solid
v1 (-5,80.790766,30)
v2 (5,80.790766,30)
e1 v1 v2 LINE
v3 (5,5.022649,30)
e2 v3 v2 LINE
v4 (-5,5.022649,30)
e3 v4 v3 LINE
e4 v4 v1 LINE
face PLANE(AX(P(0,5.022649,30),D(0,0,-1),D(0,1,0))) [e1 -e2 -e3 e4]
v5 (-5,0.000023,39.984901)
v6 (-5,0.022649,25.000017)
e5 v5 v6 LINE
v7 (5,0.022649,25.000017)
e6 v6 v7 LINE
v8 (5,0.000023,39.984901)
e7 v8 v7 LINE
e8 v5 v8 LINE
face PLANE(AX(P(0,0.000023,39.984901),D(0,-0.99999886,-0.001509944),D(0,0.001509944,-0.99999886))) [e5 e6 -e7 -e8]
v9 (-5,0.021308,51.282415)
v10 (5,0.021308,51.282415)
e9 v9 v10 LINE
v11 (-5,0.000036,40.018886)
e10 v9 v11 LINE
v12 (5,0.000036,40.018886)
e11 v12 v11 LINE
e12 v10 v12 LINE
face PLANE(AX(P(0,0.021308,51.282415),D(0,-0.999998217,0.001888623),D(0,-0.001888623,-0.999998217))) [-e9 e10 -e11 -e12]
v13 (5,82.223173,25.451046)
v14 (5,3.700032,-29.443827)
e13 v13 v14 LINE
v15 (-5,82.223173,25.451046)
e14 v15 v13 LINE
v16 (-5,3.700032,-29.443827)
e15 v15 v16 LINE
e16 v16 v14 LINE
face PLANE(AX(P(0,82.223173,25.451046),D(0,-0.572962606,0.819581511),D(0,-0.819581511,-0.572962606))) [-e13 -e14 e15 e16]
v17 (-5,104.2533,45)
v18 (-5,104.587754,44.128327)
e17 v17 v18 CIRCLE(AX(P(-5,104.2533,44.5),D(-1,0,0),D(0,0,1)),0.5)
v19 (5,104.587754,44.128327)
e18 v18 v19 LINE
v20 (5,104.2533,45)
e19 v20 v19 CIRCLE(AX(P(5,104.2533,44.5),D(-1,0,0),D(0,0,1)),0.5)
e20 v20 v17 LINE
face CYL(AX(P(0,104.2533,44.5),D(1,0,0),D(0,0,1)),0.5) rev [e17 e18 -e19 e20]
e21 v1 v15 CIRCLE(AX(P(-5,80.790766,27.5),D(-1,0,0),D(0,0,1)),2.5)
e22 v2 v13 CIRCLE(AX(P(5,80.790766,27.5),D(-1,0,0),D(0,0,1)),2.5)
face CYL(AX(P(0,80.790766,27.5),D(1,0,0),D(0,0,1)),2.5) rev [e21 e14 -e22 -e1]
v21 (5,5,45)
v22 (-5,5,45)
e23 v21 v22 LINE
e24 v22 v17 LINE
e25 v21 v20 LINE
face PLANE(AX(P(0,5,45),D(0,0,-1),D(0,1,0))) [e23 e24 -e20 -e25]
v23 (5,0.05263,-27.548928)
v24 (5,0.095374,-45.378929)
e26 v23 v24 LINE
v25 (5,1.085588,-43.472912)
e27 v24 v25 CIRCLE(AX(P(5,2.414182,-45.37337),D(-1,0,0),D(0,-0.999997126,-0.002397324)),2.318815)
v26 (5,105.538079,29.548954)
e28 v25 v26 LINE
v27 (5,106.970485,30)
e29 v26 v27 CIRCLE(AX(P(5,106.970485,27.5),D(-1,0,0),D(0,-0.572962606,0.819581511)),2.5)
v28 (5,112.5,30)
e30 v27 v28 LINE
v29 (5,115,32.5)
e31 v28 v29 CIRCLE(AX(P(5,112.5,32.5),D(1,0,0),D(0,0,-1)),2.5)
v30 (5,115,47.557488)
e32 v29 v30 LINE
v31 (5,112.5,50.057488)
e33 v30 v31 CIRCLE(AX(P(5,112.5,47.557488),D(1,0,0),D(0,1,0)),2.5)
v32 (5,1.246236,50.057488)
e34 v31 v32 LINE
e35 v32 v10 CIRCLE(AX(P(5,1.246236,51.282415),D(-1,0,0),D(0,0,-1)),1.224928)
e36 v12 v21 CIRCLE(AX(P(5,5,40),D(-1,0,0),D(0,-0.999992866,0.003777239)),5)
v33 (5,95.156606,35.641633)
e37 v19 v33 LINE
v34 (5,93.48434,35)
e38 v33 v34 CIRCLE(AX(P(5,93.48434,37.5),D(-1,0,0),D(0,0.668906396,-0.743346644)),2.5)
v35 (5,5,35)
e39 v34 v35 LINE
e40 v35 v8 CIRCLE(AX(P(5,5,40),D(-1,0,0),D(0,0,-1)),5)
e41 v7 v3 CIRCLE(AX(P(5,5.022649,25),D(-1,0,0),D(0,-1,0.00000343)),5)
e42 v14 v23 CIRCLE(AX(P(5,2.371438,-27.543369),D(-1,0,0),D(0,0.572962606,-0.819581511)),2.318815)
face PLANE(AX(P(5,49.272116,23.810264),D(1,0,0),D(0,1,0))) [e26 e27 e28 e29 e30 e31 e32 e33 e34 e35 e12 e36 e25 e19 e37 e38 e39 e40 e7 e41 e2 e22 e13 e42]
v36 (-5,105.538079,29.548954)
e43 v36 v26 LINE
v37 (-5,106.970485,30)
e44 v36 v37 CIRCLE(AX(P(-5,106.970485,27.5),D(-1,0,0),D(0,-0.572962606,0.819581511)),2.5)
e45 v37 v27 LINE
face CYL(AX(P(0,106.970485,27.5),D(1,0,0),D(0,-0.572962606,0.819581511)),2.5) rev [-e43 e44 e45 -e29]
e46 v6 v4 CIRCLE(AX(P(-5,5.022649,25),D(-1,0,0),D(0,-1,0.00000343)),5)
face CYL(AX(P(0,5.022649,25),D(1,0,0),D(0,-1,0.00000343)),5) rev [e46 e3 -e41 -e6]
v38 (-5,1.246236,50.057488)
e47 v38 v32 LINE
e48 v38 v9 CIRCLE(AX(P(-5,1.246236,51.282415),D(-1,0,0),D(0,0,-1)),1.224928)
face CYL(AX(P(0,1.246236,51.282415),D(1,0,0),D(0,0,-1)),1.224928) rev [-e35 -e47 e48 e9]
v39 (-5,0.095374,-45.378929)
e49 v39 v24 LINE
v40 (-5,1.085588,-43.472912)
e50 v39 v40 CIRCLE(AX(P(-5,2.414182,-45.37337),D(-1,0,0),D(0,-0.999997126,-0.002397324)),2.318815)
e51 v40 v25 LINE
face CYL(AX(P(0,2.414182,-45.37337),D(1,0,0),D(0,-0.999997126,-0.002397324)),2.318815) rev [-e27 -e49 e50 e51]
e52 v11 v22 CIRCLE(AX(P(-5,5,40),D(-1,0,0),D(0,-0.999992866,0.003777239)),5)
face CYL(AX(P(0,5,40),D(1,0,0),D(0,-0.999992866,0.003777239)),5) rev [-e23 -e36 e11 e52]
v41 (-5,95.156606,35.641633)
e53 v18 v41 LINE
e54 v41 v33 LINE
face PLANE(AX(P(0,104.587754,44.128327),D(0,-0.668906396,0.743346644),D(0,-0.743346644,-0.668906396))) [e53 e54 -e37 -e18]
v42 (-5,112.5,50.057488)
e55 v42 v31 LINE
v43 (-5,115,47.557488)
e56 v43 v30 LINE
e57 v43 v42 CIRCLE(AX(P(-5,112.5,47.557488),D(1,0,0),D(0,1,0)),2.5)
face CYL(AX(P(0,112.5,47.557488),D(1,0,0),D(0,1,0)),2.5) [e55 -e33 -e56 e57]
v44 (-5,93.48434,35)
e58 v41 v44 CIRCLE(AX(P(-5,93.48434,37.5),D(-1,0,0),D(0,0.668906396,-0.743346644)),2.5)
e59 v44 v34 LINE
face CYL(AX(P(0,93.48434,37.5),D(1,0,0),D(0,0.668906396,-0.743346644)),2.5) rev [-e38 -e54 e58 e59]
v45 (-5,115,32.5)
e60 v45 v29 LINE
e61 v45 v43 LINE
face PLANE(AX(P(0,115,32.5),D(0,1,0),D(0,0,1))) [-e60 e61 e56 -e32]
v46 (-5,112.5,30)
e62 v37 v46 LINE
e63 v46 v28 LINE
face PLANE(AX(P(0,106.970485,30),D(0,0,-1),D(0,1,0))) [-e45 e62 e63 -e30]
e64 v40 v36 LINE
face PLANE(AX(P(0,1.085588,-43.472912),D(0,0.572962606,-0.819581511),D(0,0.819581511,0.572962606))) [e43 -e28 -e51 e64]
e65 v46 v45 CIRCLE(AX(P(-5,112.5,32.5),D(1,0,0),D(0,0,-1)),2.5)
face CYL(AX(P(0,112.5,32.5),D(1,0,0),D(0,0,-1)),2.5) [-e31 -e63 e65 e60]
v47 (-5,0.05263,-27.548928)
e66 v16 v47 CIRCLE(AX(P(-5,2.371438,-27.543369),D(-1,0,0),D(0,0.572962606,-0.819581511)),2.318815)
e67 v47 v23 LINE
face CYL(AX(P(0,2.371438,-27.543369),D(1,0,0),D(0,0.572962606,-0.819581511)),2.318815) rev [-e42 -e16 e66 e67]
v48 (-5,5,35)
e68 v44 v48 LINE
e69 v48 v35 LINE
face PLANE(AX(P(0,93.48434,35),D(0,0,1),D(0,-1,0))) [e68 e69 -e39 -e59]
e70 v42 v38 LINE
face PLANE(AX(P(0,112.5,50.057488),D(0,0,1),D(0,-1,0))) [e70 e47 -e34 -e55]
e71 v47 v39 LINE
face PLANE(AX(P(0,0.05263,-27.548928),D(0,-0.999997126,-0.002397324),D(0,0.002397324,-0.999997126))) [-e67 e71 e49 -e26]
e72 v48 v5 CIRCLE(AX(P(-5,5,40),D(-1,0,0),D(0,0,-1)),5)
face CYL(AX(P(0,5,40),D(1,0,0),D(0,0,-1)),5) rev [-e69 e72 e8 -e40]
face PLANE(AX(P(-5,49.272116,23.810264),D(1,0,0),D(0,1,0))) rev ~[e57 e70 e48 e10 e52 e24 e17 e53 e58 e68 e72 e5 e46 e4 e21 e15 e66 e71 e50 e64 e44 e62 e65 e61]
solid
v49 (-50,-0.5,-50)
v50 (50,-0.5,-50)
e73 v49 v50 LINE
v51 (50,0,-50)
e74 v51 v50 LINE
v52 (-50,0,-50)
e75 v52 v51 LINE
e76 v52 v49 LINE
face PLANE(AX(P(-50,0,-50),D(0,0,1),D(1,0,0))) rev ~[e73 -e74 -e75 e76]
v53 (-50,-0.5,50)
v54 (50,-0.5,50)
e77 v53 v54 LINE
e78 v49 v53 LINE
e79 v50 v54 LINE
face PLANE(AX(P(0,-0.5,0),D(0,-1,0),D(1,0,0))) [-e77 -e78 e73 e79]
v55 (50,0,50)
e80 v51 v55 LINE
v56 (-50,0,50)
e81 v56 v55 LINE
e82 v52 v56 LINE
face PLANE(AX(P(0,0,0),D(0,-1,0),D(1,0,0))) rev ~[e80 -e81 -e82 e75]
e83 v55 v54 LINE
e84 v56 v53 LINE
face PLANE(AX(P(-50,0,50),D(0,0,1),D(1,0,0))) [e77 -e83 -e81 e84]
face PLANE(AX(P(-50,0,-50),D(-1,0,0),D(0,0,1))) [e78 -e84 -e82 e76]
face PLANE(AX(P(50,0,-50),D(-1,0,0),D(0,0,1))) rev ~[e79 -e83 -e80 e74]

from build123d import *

# Parameters (mm, degrees)
F4_DEPTH = 5
F0_W     = 100
F0_H     = 100
F6_DEPTH = 0.5


# Not quite as in the source:
# - the program builds the solid bodies; features that only make, move or delete a surface that nothing else refers to are left out


with BuildPart() as f4:
    # F1 (on Right) → F4 (new body, symmetric)
    with BuildSketch(Plane.YZ):
        with BuildLine():
            ThreePointArc((104.2533004827, 45), (104.7201177173, 44.6791135659), (104.5877536809, 44.128326678))
            Line((104.5877536809, 44.128326678), (95.1566060497, 35.6416333901))
            ThreePointArc((95.1566060497, 35.6416333901), (94.3799078888, 35.1659138271), (93.4843400592, 35))
            Line((93.4843400592, 35), (5, 35))
            ThreePointArc((5, 35), (1.4698085841, 36.4591316648), (2.27993e-05, 39.9849005732))
            Line((2.27993e-05, 39.9849005732), (0.0226491659, 25.0000171511))
            ThreePointArc((0.0226491659, 25.0000171511), (1.4871213238, 28.5355399698), (5.0226491659, 30))
            Line((5.0226491659, 30), (80.7907660618, 30))
            ThreePointArc((80.7907660618, 30), (83.1753398645, 28.2508713467), (82.2231725759, 25.4510462235))
            Line((82.2231725759, 25.4510462235), (3.7000322722, -29.44382694))
            ThreePointArc((3.7000322722, -29.44382694), (1.3024238225, -29.6010647183), (0.0526297849, -27.5489280609))
            Line((0.0526297849, -27.5489280609), (0.0953742048, -45.3789287217))
            ThreePointArc((0.0953742048, -45.3789287217), (0.3564868473, -44.3043555559), (1.0855882207, -43.4729119391))
            Line((1.0855882207, -43.4729119391), (105.5380785244, 29.5489537765))
            ThreePointArc((105.5380785244, 29.5489537765), (106.2196136918, 29.8845738027), (106.9704850386, 30))
            Line((106.9704850386, 30), (112.5, 30))
            ThreePointArc((112.5, 30), (114.267766953, 30.732233047), (115, 32.5))
            Line((115, 32.5), (115, 47.5574878287))
            ThreePointArc((115, 47.5574878287), (114.267766953, 49.3252547817), (112.5, 50.0574878287))
            Line((112.5, 50.0574878287), (1.2462358677, 50.0574878287))
            ThreePointArc((1.2462358677, 50.0574878287), (0.3800812524, 50.4162608175), (0.0213082636, 51.2824154329))
            Line((0.0213082636, 51.2824154329), (3.5669e-05, 40.018886193))
            ThreePointArc((3.5669e-05, 40.018886193), (1.471149689, 43.54220489), (5, 45))
            Line((5, 45), (104.2533004827, 45))
        make_face()
    extrude(amount=F4_DEPTH, both=True)


with BuildPart() as f6:
    # F0 (on Front) → F6 (new body)
    with BuildSketch(Plane.XZ):
        Rectangle(F0_W, F0_H)
    extrude(amount=F6_DEPTH)


solid = Compound([f4.part, f6.part])
